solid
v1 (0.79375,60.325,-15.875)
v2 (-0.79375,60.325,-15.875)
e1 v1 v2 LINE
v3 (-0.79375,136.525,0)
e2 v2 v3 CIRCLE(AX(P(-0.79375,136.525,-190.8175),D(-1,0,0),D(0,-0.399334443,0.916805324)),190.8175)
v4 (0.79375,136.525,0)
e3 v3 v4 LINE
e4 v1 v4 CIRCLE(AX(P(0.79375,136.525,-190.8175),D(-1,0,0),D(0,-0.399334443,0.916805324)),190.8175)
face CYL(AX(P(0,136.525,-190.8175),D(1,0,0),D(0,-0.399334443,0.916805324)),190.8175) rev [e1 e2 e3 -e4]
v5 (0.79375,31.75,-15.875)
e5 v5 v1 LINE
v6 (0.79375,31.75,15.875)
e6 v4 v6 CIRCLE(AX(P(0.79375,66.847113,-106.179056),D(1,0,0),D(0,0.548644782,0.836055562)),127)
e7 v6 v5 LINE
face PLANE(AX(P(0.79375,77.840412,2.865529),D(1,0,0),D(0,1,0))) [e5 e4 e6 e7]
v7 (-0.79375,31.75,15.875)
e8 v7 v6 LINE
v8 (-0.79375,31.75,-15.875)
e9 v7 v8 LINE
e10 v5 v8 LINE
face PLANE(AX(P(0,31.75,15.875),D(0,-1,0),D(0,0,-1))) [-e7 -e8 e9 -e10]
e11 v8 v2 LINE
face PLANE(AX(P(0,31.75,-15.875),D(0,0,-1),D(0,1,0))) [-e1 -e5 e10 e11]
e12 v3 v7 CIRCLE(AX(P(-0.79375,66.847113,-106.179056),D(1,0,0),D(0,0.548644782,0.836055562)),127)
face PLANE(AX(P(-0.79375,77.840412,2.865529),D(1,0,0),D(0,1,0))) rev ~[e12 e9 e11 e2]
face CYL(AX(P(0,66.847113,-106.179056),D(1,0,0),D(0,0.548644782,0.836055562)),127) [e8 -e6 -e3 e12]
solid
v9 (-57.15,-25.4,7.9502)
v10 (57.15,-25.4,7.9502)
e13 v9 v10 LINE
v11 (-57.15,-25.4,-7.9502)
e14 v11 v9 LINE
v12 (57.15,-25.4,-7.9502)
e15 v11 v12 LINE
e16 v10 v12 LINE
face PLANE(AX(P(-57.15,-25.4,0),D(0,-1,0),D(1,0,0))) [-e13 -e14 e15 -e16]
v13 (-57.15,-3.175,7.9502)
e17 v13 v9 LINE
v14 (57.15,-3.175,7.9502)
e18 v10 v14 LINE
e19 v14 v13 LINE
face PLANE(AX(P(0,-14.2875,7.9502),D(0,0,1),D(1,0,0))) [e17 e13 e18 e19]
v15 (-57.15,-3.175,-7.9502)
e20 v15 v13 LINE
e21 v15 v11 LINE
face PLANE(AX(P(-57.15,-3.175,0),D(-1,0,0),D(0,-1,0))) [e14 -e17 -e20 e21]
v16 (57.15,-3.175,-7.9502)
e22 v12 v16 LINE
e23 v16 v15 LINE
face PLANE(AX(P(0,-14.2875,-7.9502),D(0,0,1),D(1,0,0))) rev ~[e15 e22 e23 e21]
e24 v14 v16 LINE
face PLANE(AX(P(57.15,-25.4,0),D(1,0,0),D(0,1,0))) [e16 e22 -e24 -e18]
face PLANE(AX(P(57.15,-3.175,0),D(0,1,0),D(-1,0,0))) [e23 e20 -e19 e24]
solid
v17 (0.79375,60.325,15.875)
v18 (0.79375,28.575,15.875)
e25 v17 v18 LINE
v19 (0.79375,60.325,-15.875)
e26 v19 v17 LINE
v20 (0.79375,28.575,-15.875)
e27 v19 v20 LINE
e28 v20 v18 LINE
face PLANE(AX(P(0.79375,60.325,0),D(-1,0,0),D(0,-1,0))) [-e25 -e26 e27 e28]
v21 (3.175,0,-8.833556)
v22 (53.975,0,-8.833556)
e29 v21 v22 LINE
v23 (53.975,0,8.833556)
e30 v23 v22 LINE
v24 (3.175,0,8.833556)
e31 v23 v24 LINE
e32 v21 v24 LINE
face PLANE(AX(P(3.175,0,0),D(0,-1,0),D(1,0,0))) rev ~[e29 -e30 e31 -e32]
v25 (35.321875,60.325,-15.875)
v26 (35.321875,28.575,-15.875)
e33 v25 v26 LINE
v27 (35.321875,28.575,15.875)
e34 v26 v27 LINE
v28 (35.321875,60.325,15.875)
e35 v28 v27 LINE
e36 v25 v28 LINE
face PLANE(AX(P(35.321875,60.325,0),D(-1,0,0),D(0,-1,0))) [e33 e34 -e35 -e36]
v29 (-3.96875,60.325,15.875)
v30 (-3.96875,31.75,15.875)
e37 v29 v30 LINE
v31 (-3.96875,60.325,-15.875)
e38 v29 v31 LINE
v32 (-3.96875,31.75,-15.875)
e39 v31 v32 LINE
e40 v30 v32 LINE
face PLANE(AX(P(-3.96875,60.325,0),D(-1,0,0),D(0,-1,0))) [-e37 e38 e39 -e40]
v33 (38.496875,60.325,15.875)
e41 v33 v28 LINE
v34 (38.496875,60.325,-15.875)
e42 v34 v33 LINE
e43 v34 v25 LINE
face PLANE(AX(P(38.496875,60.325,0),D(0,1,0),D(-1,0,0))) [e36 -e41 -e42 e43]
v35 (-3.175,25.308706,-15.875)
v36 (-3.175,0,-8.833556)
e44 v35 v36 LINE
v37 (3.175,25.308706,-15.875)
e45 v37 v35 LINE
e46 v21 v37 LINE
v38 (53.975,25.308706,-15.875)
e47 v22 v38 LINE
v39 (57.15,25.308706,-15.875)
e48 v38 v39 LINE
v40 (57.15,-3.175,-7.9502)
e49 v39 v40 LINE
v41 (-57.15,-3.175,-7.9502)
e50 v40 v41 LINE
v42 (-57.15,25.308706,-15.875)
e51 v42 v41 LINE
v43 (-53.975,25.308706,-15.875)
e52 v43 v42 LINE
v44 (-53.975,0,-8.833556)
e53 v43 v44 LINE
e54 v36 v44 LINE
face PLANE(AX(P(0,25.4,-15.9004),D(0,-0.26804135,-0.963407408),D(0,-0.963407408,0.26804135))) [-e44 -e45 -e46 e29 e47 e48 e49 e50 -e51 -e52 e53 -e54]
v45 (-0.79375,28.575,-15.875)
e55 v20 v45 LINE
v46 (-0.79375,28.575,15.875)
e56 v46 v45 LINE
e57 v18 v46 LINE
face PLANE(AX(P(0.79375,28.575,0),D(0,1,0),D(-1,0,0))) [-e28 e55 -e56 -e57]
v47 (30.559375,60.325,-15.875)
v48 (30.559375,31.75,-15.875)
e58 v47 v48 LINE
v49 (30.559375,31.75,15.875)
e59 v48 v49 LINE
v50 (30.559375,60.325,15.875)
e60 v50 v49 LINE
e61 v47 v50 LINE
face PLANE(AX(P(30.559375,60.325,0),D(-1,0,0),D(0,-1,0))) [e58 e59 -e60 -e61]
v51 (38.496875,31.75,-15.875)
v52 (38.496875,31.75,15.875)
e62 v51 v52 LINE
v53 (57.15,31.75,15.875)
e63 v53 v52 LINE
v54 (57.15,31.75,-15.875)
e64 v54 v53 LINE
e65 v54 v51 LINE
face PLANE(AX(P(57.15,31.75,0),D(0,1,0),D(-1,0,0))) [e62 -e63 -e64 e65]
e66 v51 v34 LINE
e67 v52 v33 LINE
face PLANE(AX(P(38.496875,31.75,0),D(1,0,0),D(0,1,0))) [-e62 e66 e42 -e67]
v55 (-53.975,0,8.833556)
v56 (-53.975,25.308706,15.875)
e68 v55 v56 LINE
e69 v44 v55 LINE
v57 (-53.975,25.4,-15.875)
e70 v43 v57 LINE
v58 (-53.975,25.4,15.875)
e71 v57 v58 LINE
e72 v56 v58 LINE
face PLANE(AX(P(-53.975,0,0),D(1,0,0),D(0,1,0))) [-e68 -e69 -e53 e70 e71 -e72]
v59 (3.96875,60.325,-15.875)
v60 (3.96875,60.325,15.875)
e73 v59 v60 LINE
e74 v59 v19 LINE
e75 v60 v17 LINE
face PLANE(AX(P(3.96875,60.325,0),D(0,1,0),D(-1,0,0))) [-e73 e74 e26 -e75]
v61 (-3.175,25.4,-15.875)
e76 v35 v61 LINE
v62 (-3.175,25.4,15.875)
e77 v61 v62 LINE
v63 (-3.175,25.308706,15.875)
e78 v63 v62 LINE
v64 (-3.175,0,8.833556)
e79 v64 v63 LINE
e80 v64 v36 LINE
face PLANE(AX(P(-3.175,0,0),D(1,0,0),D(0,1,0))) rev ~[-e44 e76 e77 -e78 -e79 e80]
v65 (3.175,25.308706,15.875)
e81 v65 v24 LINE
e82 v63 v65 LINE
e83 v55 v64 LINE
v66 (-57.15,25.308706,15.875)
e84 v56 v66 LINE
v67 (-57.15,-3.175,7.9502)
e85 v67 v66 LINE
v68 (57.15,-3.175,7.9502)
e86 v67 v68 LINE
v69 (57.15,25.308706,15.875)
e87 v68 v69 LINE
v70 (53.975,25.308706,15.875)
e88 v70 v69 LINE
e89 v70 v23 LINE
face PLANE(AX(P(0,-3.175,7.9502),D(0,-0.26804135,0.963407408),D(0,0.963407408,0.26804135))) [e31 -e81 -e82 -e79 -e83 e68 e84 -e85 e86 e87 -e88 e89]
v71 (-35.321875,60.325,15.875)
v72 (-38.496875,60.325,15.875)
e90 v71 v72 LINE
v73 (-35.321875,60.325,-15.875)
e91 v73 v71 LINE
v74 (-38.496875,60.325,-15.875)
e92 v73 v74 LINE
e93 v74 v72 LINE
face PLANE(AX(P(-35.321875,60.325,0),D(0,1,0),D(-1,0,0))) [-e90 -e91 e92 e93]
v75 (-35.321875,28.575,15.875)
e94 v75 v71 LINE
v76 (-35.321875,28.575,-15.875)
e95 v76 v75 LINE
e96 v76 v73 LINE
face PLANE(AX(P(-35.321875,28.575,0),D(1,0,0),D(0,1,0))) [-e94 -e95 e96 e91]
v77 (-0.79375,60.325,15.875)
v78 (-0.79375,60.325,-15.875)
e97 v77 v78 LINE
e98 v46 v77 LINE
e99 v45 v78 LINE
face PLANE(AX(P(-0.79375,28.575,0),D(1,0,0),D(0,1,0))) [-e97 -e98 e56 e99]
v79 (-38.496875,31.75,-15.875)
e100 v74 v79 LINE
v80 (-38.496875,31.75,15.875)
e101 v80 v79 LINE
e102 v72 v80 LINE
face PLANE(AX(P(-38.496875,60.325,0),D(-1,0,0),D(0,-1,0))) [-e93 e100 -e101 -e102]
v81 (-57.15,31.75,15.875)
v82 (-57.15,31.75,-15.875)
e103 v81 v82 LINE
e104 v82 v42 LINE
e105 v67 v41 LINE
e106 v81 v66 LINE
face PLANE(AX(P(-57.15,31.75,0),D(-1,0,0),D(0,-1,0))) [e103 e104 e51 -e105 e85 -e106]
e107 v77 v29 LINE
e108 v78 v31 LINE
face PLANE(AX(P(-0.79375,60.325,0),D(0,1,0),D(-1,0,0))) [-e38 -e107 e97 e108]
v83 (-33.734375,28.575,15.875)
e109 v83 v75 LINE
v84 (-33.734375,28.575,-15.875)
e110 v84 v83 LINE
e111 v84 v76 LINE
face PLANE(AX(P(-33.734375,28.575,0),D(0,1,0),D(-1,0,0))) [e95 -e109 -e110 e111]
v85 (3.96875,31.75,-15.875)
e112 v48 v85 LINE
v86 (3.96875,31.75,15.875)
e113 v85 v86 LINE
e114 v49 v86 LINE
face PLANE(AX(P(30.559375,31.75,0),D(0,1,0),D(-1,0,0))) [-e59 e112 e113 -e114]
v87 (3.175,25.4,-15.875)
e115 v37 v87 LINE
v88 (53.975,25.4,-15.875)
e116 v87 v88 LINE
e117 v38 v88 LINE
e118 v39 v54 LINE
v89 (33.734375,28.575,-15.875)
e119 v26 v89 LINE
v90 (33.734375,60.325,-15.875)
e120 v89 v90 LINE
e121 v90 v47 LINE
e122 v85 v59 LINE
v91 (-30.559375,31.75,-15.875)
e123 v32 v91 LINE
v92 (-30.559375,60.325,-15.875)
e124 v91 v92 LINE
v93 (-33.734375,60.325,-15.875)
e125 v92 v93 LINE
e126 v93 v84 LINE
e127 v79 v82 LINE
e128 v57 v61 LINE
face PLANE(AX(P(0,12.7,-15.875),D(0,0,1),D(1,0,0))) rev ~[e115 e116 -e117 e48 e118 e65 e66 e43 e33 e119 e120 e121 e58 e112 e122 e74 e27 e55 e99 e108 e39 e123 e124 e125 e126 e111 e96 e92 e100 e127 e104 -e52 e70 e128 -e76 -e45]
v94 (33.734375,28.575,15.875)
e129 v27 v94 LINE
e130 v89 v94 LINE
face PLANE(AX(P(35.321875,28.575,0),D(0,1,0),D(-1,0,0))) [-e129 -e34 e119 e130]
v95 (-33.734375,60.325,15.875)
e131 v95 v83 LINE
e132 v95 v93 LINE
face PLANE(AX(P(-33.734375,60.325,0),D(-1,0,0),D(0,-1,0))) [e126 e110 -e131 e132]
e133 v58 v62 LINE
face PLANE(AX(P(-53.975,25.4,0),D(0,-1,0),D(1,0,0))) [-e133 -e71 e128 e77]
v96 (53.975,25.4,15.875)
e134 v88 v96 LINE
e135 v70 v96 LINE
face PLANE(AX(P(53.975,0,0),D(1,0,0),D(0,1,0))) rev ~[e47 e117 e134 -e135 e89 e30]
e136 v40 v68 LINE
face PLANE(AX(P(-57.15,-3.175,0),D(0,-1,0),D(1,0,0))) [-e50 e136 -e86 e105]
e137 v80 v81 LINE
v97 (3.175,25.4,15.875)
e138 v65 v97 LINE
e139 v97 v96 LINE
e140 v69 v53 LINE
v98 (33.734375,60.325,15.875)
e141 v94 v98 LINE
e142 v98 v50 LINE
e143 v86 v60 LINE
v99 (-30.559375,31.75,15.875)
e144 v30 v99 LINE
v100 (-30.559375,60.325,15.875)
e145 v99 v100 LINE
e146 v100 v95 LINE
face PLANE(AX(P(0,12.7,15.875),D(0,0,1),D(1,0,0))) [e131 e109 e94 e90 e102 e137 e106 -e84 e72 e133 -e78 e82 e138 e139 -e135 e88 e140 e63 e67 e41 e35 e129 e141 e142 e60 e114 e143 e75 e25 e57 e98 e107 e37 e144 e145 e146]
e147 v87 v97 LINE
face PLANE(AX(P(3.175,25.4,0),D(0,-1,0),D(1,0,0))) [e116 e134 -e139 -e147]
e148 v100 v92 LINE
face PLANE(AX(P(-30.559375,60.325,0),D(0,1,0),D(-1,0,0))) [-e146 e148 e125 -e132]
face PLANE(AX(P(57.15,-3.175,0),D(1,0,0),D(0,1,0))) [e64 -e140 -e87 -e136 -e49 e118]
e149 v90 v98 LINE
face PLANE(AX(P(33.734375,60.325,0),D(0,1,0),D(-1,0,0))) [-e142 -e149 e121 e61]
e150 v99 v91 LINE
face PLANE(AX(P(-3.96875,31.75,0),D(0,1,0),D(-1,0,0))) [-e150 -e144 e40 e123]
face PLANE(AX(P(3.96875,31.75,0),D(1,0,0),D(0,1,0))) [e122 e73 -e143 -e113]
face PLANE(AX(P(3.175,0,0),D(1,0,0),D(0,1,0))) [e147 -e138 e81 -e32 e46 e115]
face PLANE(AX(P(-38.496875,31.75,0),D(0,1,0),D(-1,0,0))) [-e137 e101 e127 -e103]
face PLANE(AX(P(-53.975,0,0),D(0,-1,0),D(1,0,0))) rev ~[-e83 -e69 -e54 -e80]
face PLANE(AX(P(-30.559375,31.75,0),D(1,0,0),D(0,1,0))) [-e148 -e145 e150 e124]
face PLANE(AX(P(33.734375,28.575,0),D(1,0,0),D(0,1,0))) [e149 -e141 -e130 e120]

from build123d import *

# Parameters (mm, degrees)
F0_W          = 50.8
F0_H          = 25.4
F1_DEPTH      = 15.875
F1_DEPTH_BACK = 15.875
F2_DEPTH      = 7.9502
F2_DEPTH_BACK = 7.9502
F3_DEPTH      = 15.875
F3_DEPTH_BACK = 15.875
F7_DEPTH      = 57.15
F7_DEPTH_BACK = 57.15
F9_DEPTH      = 0.79375
F9_DEPTH_BACK = 0.79375


# Not quite as in the source:
# - the program builds the solid bodies; features that only make, move or delete a surface that nothing else refers to are left out


with BuildPart() as f1:
    # F0 (on Top) → F1 (new body, two sides)
    with BuildSketch(Plane.XY) as f1_sk:
        Polygon((-57.15, -3.175), (0, -3.175), (57.15, -3.175), (57.15, 28.575), (35.321875, 28.575), (33.734375, 28.575), (32.54375, 28.575), (0.79375, 28.575), (-0.79375, 28.575), (-32.54375, 28.575), (-33.734375, 28.575), (-35.321875, 28.575), (-57.15, 28.575), align=None)
        with Locations((-28.575, 12.7)):
            Rectangle(F0_W, F0_H, mode=Mode.SUBTRACT)
        with Locations((28.575, 12.7)):
            Rectangle(F0_W, F0_H, mode=Mode.SUBTRACT)
        Polygon((-57.15, 31.75), (-57.15, 28.575), (-35.321875, 28.575), (-35.321875, 60.325), (-38.496875, 60.325), (-38.496875, 31.75), align=None)
        Polygon((35.321875, 28.575), (57.15, 28.575), (57.15, 31.75), (38.496875, 31.75), (38.496875, 60.325), (35.321875, 60.325), align=None)
        Polygon((32.54375, 28.575), (33.734375, 28.575), (33.734375, 60.325), (30.559375, 60.325), (30.559375, 31.75), (17.2640625, 31.75), (3.96875, 31.75), (3.96875, 60.325), (0.79375, 60.325), (0.79375, 28.575), align=None)
        Polygon((-33.734375, 60.325), (-33.734375, 28.575), (-32.54375, 28.575), (-0.79375, 28.575), (-0.79375, 60.325), (-3.96875, 60.325), (-3.96875, 31.75), (-17.2640625, 31.75), (-30.559375, 31.75), (-30.559375, 60.325), align=None)
    extrude(amount=F1_DEPTH)
    extrude(f1_sk.sketch, amount=-F1_DEPTH_BACK)

    # F0 (on Top) → F3 (join, two sides)
    with BuildSketch(Plane.XY) as f3_sk:
        Polygon((-33.734375, 60.325), (-33.734375, 28.575), (-32.54375, 28.575), (-0.79375, 28.575), (-0.79375, 60.325), (-3.96875, 60.325), (-3.96875, 31.75), (-17.2640625, 31.75), (-30.559375, 31.75), (-30.559375, 60.325), align=None)
        Polygon((32.54375, 28.575), (33.734375, 28.575), (33.734375, 60.325), (30.559375, 60.325), (30.559375, 31.75), (17.2640625, 31.75), (3.96875, 31.75), (3.96875, 60.325), (0.79375, 60.325), (0.79375, 28.575), align=None)
    extrude(amount=F3_DEPTH)
    extrude(f3_sk.sketch, amount=-F3_DEPTH_BACK)

    # F6 (on Right) → F7 (cut, two sides)
    with BuildSketch(Plane.YZ) as f7_sk:
        Polygon((25.4, -15.9004), (-3.175, -7.9502), (-3.175, -15.9004), align=None)
        Polygon((-3.175, 15.9004), (-3.175, 7.9502), (25.4, 15.9004), align=None)
    extrude(amount=-F7_DEPTH, mode=Mode.SUBTRACT)
    extrude(f7_sk.sketch, amount=F7_DEPTH_BACK, mode=Mode.SUBTRACT)


with BuildPart() as f2:
    # F0 (on Top) → F2 (new body, two sides)
    with BuildSketch(Plane.XY) as f2_sk:
        Polygon((57.15, -3.175), (0, -3.175), (-57.15, -3.175), (-57.15, -25.4), (57.15, -25.4), align=None)
    extrude(amount=F2_DEPTH)
    extrude(f2_sk.sketch, amount=-F2_DEPTH_BACK)


with BuildPart() as f9:
    # F8 (on Right) → F9 (new body, two sides)
    with BuildSketch(Plane.YZ) as f9_sk:
        with BuildLine():
            ThreePointArc((60.325, -15.875), (97.606959116, -4.0109037567), (136.525, 0))
            ThreePointArc((136.525, 0), (85.8723958548, 19.3878126418), (31.75, 15.875))
            Line((31.75, 15.875), (31.75, -15.875))
            Line((31.75, -15.875), (60.325, -15.875))
        make_face()
    extrude(amount=F9_DEPTH)
    extrude(f9_sk.sketch, amount=-F9_DEPTH_BACK)


solid = Compound([f1.part, f2.part, f9.part])
